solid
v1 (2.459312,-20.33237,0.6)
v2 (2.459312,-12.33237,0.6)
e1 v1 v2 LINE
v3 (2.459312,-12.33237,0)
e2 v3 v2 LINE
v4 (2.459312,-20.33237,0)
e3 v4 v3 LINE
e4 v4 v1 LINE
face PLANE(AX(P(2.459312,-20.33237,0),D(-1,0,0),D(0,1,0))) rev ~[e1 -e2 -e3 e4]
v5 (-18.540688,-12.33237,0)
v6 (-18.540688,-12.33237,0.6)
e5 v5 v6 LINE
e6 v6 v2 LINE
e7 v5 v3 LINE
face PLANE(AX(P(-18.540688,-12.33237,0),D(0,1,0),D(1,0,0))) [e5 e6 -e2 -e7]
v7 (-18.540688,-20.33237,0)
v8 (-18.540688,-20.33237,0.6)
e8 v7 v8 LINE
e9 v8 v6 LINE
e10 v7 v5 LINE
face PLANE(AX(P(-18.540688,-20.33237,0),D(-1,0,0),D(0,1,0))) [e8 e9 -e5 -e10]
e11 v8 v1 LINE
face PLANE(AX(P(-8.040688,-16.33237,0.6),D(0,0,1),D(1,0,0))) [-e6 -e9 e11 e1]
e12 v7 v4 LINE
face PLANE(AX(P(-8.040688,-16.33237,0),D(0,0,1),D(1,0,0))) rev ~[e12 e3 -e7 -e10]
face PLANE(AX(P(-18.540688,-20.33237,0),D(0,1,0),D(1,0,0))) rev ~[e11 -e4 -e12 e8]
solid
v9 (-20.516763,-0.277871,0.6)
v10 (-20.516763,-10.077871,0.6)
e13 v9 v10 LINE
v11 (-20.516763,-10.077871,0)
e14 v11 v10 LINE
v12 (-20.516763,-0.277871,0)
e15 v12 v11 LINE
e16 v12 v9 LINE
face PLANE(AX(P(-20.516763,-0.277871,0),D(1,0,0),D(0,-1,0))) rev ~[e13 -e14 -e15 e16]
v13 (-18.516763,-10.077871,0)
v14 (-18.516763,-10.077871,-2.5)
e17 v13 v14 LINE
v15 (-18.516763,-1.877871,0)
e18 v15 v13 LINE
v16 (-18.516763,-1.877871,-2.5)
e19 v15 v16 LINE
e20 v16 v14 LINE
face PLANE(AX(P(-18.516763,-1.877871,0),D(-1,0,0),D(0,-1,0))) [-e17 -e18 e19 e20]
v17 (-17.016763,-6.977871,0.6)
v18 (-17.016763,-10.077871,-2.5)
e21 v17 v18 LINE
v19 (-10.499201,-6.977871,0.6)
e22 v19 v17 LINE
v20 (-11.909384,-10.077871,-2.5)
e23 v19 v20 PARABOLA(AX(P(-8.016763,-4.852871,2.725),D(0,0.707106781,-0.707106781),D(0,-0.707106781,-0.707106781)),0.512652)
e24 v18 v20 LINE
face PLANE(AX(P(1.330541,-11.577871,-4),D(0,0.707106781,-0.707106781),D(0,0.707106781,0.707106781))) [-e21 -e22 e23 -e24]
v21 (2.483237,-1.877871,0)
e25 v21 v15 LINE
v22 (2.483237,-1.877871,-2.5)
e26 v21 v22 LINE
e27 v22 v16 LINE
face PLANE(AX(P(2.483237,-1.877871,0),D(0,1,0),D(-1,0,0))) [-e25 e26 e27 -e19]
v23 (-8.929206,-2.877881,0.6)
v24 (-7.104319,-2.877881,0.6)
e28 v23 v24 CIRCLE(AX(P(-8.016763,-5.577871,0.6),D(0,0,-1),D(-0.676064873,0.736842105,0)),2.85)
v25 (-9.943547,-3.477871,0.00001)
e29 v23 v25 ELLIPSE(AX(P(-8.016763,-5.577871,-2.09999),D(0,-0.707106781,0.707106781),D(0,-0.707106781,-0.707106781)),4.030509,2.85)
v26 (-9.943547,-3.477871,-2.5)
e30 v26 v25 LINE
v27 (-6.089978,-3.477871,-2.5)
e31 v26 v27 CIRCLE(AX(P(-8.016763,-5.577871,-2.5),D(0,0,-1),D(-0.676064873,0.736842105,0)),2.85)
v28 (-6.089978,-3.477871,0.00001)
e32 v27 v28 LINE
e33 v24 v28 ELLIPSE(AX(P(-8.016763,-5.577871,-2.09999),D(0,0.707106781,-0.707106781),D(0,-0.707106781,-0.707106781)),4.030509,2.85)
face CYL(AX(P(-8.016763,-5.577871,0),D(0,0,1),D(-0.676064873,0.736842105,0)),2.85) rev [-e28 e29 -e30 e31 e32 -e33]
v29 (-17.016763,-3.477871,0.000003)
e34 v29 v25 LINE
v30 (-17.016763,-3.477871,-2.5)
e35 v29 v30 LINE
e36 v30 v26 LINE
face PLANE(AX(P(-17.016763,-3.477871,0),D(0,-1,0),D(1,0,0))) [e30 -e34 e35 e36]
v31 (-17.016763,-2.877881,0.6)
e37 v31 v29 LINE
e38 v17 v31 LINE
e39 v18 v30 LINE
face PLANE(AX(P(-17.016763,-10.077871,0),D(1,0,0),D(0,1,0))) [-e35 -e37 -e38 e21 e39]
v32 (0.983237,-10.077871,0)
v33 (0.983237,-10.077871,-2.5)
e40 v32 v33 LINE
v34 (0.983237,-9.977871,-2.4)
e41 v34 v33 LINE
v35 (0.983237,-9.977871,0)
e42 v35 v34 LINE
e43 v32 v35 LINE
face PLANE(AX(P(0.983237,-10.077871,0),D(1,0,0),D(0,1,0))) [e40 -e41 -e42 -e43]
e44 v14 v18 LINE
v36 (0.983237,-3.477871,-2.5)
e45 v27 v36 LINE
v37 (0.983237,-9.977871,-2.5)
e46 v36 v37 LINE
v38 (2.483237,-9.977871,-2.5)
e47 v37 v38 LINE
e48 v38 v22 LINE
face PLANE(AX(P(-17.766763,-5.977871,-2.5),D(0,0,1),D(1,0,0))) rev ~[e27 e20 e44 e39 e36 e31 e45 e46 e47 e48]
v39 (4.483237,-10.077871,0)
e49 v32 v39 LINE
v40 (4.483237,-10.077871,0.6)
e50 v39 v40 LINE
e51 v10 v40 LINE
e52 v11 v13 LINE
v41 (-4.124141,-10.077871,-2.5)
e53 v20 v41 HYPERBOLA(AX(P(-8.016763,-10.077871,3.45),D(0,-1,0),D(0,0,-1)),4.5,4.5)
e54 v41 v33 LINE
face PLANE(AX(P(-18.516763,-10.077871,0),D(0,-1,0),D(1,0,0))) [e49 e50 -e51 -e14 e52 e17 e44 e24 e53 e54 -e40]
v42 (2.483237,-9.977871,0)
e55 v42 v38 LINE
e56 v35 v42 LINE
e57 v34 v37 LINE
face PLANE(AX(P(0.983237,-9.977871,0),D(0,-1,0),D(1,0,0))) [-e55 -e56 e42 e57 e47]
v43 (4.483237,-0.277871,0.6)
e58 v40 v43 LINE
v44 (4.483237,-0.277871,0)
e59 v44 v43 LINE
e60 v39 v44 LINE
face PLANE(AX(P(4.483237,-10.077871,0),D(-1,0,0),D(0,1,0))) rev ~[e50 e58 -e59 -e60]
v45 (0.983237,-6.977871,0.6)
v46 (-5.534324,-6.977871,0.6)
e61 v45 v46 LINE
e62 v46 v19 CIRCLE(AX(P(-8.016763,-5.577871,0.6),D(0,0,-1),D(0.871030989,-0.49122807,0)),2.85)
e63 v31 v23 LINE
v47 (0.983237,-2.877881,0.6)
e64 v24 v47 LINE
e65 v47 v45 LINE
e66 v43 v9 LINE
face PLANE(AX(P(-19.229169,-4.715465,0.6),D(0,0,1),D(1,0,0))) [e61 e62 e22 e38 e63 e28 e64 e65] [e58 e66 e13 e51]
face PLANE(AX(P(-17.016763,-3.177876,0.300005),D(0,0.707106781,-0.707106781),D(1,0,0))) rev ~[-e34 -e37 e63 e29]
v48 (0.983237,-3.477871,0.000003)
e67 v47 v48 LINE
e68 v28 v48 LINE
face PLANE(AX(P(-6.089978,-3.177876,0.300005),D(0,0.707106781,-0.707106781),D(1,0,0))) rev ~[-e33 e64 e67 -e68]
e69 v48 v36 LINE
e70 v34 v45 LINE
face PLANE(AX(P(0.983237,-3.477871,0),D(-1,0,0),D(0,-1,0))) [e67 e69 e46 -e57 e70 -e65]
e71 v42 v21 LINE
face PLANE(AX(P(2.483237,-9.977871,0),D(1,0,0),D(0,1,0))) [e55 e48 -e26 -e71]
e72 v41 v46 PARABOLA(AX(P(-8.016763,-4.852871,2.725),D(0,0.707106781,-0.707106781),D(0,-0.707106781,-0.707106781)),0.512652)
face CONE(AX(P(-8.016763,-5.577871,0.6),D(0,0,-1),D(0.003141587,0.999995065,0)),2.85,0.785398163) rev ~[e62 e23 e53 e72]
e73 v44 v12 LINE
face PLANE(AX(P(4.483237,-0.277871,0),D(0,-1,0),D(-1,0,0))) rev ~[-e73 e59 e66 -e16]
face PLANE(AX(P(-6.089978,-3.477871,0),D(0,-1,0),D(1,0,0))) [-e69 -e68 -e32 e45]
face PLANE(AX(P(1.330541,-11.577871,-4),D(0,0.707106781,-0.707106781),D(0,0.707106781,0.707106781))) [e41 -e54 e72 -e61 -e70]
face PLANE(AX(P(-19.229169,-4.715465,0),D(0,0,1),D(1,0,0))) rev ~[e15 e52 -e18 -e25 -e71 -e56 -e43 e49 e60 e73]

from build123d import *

# Parameters (mm, degrees)
F0_W         = 18
F0_H         = 1.6
F1_DEPTH     = 0.6
F0_W_2       = 21
F0_H_2       = 8
F2_DEPTH     = 4
F3_T4_DEPTH  = 18.3473034272
F3_T9_DEPTH  = 18.3473034272
F3_T14_ANGLE = 359.64
F4_SIZE      = 0.59999
F5_DEPTH     = 2.5


# Not quite as in the source:
# - a fillet or chamfer that OpenCascade refuses, or shapes differently, is made with other operations: its cross-section is extruded or revolved along the edge and cut away or added
# - a fillet or chamfer is up to 0.001 mm smaller than in the source, because OpenCascade refuses the exact size
# - a feature of the source that left no trace in its solid (it failed there, or was rolled back) is left out


with BuildPart() as f1:
    # F0 (on Top) → F1 (new body)
    with BuildSketch(Plane.XY):
        Polygon((-17.0167625099, -0.2778713822), (-20.5167625099, -0.2778713822), (-20.5167625099, -10.0778713822), (-18.5167625099, -10.0778713822), (-18.5167625099, -1.8778713822), (-17.0167625099, -1.8778713822), align=None)
        with Locations((-8.0167625099, -1.0778713822)):
            Rectangle(F0_W, F0_H)
        Polygon((4.4832374901, -0.2778713822), (0.9832374901, -0.2778713822), (0.9832374901, -1.8778713822), (2.4832374901, -1.8778713822), (2.4832374901, -9.9778713822), (0.9832374901, -9.9778713822), (0.9832374901, -10.0778713822), (4.4832374901, -10.0778713822), align=None)
        Polygon((-17.0167625099, -3.4778713822), (-17.0167625099, -1.8778713822), (-18.5167625099, -1.8778713822), (-18.5167625099, -10.0778713822), (-17.0167625099, -10.0778713822), (-17.0167625099, -6.9778713822), align=None)
        with BuildLine():
            Line((-17.0167625099, -6.9778713822), (-17.0167625099, -10.0778713822))
            Line((-17.0167625099, -10.0778713822), (0.9832374901, -10.0778713822))
            Line((0.9832374901, -10.0778713822), (0.9832374901, -9.9778713822))
            Line((0.9832374901, -9.9778713822), (0.9832374901, -6.9778713822))
            Line((0.9832374901, -6.9778713822), (-5.5343241925, -6.9778713822))
            ThreePointArc((-5.5343241925, -6.9778713822), (-8.0167625099, -8.4278713822), (-10.4992008274, -6.9778713822))
            Line((-10.4992008274, -6.9778713822), (-17.0167625099, -6.9778713822))
        make_face()
        Polygon((2.4832374901, -1.8778713822), (0.9832374901, -1.8778713822), (0.9832374901, -3.4778713822), (0.9832374901, -6.9778713822), (0.9832374901, -9.9778713822), (2.4832374901, -9.9778713822), align=None)
        with BuildLine():
            Line((0.9832374901, -1.8778713822), (-17.0167625099, -1.8778713822))
            Line((-17.0167625099, -1.8778713822), (-17.0167625099, -3.4778713822))
            Line((-17.0167625099, -3.4778713822), (-9.9435473967, -3.4778713822))
            ThreePointArc((-9.9435473967, -3.4778713822), (-8.0167625099, -2.7278713822), (-6.0899776231, -3.4778713822))
            Line((-6.0899776231, -3.4778713822), (0.9832374901, -3.4778713822))
            Line((0.9832374901, -3.4778713822), (0.9832374901, -1.8778713822))
        make_face()
    extrude(amount=F1_DEPTH)

    # F0 (on Top) → F2 (join)
    with BuildSketch(Plane.XY):
        with BuildLine():
            Line((-17.0167625099, -6.9778713822), (-17.0167625099, -10.0778713822))
            Line((-17.0167625099, -10.0778713822), (0.9832374901, -10.0778713822))
            Line((0.9832374901, -10.0778713822), (0.9832374901, -9.9778713822))
            Line((0.9832374901, -9.9778713822), (0.9832374901, -6.9778713822))
            Line((0.9832374901, -6.9778713822), (-5.5343241925, -6.9778713822))
            ThreePointArc((-5.5343241925, -6.9778713822), (-8.0167625099, -8.4278713822), (-10.4992008274, -6.9778713822))
            Line((-10.4992008274, -6.9778713822), (-17.0167625099, -6.9778713822))
        make_face()
    extrude(amount=-F2_DEPTH)

    # F3: chamfer of 4.6 on 3 edges, made by hand


with BuildPart() as f1b:
    # F0 (on Top) → F1, piece 2 (new body)
    with BuildSketch(Plane.XY):
        with Locations((-8.0406878591, -16.3323699534)):
            Rectangle(F0_W_2, F0_H_2)
    extrude(amount=F1_DEPTH)


with BuildPart() as f3_tool2:
    # F3_s3 → F3_t4 (new body)
    with BuildSketch(Plane.YZ.offset(1.3305409172)):
        Polygon((-11.5778713822, -4), (-6.9778713822, 0.6), (-6.9778713822, -4), align=None)
    extrude(amount=-F3_T4_DEPTH)

    split(bisect_by=Plane.YZ.offset(0.9832374901), keep=Keep.BOTTOM)


with BuildPart() as f1_1:
    add(f1.part)

    # F3_t1: cut F3_tool2
    add(f3_tool2.part, mode=Mode.SUBTRACT)


with BuildPart() as f3_tool7:
    # F3_s8 → F3_t9 (new body)
    with BuildSketch(Plane.YZ.offset(0.9832374901)):
        Polygon((-11.5778713822, -4), (-6.9778713822, 0.6), (-6.9778713822, -4), align=None)
    extrude(amount=-F3_T9_DEPTH)

    split(bisect_by=Plane.YZ.offset(-17.0167625099), keep=Keep.TOP)


with BuildPart() as f1_2:
    add(f1_1.part)

    # F3_t6: cut F3_tool7
    add(f3_tool7.part, mode=Mode.SUBTRACT)


with BuildPart() as f3_tool12:
    # F3_s13 → F3_t14 (revolve)
    with BuildSketch(Plane(origin=(-7.9991601035, 0.0251301853, 0), x_dir=(0, 0, 1), z_dir=(-0.9999950652, 0.0031415875, 0))):
        Polygon((0.6, -2.7530292173), (-4, 1.8469707827), (-4, -2.7530292173), align=None)
    revolve(axis=Axis((-8.0167625099, -5.5778713822, -4), (0, 0, -1)), revolution_arc=F3_T14_ANGLE)

    split(bisect_by=Plane.XZ.offset(3.4778713822), keep=Keep.TOP)


with BuildPart() as f1_3:
    add(f1_2.part)

    # F3_t11: cut F3_tool12
    add(f3_tool12.part, mode=Mode.SUBTRACT)

    # F4 (size 0.6 in the source; OpenCascade refuses exactly that, so slightly less here)
    f4_edges = [f1_3.edges().sort_by_distance(p)[0] for p in [
        (-13.480155, -3.477871, 0.6),
        (-2.55337, -3.477871, 0.6),
    ]]
    chamfer(f4_edges, length=F4_SIZE)

    # F0 (on Top) → F5 (join)
    with BuildSketch(Plane.XY):
        Polygon((-17.0167625099, -3.4778713822), (-17.0167625099, -1.8778713822), (-18.5167625099, -1.8778713822), (-18.5167625099, -10.0778713822), (-17.0167625099, -10.0778713822), (-17.0167625099, -6.9778713822), align=None)
        with BuildLine():
            Line((0.9832374901, -1.8778713822), (-17.0167625099, -1.8778713822))
            Line((-17.0167625099, -1.8778713822), (-17.0167625099, -3.4778713822))
            Line((-17.0167625099, -3.4778713822), (-9.9435473967, -3.4778713822))
            ThreePointArc((-9.9435473967, -3.4778713822), (-8.0167625099, -2.7278713822), (-6.0899776231, -3.4778713822))
            Line((-6.0899776231, -3.4778713822), (0.9832374901, -3.4778713822))
            Line((0.9832374901, -3.4778713822), (0.9832374901, -1.8778713822))
        make_face()
        Polygon((2.4832374901, -1.8778713822), (0.9832374901, -1.8778713822), (0.9832374901, -3.4778713822), (0.9832374901, -6.9778713822), (0.9832374901, -9.9778713822), (2.4832374901, -9.9778713822), align=None)
    extrude(amount=-F5_DEPTH)


solid = Compound([f1b.part, f1_3.part])
